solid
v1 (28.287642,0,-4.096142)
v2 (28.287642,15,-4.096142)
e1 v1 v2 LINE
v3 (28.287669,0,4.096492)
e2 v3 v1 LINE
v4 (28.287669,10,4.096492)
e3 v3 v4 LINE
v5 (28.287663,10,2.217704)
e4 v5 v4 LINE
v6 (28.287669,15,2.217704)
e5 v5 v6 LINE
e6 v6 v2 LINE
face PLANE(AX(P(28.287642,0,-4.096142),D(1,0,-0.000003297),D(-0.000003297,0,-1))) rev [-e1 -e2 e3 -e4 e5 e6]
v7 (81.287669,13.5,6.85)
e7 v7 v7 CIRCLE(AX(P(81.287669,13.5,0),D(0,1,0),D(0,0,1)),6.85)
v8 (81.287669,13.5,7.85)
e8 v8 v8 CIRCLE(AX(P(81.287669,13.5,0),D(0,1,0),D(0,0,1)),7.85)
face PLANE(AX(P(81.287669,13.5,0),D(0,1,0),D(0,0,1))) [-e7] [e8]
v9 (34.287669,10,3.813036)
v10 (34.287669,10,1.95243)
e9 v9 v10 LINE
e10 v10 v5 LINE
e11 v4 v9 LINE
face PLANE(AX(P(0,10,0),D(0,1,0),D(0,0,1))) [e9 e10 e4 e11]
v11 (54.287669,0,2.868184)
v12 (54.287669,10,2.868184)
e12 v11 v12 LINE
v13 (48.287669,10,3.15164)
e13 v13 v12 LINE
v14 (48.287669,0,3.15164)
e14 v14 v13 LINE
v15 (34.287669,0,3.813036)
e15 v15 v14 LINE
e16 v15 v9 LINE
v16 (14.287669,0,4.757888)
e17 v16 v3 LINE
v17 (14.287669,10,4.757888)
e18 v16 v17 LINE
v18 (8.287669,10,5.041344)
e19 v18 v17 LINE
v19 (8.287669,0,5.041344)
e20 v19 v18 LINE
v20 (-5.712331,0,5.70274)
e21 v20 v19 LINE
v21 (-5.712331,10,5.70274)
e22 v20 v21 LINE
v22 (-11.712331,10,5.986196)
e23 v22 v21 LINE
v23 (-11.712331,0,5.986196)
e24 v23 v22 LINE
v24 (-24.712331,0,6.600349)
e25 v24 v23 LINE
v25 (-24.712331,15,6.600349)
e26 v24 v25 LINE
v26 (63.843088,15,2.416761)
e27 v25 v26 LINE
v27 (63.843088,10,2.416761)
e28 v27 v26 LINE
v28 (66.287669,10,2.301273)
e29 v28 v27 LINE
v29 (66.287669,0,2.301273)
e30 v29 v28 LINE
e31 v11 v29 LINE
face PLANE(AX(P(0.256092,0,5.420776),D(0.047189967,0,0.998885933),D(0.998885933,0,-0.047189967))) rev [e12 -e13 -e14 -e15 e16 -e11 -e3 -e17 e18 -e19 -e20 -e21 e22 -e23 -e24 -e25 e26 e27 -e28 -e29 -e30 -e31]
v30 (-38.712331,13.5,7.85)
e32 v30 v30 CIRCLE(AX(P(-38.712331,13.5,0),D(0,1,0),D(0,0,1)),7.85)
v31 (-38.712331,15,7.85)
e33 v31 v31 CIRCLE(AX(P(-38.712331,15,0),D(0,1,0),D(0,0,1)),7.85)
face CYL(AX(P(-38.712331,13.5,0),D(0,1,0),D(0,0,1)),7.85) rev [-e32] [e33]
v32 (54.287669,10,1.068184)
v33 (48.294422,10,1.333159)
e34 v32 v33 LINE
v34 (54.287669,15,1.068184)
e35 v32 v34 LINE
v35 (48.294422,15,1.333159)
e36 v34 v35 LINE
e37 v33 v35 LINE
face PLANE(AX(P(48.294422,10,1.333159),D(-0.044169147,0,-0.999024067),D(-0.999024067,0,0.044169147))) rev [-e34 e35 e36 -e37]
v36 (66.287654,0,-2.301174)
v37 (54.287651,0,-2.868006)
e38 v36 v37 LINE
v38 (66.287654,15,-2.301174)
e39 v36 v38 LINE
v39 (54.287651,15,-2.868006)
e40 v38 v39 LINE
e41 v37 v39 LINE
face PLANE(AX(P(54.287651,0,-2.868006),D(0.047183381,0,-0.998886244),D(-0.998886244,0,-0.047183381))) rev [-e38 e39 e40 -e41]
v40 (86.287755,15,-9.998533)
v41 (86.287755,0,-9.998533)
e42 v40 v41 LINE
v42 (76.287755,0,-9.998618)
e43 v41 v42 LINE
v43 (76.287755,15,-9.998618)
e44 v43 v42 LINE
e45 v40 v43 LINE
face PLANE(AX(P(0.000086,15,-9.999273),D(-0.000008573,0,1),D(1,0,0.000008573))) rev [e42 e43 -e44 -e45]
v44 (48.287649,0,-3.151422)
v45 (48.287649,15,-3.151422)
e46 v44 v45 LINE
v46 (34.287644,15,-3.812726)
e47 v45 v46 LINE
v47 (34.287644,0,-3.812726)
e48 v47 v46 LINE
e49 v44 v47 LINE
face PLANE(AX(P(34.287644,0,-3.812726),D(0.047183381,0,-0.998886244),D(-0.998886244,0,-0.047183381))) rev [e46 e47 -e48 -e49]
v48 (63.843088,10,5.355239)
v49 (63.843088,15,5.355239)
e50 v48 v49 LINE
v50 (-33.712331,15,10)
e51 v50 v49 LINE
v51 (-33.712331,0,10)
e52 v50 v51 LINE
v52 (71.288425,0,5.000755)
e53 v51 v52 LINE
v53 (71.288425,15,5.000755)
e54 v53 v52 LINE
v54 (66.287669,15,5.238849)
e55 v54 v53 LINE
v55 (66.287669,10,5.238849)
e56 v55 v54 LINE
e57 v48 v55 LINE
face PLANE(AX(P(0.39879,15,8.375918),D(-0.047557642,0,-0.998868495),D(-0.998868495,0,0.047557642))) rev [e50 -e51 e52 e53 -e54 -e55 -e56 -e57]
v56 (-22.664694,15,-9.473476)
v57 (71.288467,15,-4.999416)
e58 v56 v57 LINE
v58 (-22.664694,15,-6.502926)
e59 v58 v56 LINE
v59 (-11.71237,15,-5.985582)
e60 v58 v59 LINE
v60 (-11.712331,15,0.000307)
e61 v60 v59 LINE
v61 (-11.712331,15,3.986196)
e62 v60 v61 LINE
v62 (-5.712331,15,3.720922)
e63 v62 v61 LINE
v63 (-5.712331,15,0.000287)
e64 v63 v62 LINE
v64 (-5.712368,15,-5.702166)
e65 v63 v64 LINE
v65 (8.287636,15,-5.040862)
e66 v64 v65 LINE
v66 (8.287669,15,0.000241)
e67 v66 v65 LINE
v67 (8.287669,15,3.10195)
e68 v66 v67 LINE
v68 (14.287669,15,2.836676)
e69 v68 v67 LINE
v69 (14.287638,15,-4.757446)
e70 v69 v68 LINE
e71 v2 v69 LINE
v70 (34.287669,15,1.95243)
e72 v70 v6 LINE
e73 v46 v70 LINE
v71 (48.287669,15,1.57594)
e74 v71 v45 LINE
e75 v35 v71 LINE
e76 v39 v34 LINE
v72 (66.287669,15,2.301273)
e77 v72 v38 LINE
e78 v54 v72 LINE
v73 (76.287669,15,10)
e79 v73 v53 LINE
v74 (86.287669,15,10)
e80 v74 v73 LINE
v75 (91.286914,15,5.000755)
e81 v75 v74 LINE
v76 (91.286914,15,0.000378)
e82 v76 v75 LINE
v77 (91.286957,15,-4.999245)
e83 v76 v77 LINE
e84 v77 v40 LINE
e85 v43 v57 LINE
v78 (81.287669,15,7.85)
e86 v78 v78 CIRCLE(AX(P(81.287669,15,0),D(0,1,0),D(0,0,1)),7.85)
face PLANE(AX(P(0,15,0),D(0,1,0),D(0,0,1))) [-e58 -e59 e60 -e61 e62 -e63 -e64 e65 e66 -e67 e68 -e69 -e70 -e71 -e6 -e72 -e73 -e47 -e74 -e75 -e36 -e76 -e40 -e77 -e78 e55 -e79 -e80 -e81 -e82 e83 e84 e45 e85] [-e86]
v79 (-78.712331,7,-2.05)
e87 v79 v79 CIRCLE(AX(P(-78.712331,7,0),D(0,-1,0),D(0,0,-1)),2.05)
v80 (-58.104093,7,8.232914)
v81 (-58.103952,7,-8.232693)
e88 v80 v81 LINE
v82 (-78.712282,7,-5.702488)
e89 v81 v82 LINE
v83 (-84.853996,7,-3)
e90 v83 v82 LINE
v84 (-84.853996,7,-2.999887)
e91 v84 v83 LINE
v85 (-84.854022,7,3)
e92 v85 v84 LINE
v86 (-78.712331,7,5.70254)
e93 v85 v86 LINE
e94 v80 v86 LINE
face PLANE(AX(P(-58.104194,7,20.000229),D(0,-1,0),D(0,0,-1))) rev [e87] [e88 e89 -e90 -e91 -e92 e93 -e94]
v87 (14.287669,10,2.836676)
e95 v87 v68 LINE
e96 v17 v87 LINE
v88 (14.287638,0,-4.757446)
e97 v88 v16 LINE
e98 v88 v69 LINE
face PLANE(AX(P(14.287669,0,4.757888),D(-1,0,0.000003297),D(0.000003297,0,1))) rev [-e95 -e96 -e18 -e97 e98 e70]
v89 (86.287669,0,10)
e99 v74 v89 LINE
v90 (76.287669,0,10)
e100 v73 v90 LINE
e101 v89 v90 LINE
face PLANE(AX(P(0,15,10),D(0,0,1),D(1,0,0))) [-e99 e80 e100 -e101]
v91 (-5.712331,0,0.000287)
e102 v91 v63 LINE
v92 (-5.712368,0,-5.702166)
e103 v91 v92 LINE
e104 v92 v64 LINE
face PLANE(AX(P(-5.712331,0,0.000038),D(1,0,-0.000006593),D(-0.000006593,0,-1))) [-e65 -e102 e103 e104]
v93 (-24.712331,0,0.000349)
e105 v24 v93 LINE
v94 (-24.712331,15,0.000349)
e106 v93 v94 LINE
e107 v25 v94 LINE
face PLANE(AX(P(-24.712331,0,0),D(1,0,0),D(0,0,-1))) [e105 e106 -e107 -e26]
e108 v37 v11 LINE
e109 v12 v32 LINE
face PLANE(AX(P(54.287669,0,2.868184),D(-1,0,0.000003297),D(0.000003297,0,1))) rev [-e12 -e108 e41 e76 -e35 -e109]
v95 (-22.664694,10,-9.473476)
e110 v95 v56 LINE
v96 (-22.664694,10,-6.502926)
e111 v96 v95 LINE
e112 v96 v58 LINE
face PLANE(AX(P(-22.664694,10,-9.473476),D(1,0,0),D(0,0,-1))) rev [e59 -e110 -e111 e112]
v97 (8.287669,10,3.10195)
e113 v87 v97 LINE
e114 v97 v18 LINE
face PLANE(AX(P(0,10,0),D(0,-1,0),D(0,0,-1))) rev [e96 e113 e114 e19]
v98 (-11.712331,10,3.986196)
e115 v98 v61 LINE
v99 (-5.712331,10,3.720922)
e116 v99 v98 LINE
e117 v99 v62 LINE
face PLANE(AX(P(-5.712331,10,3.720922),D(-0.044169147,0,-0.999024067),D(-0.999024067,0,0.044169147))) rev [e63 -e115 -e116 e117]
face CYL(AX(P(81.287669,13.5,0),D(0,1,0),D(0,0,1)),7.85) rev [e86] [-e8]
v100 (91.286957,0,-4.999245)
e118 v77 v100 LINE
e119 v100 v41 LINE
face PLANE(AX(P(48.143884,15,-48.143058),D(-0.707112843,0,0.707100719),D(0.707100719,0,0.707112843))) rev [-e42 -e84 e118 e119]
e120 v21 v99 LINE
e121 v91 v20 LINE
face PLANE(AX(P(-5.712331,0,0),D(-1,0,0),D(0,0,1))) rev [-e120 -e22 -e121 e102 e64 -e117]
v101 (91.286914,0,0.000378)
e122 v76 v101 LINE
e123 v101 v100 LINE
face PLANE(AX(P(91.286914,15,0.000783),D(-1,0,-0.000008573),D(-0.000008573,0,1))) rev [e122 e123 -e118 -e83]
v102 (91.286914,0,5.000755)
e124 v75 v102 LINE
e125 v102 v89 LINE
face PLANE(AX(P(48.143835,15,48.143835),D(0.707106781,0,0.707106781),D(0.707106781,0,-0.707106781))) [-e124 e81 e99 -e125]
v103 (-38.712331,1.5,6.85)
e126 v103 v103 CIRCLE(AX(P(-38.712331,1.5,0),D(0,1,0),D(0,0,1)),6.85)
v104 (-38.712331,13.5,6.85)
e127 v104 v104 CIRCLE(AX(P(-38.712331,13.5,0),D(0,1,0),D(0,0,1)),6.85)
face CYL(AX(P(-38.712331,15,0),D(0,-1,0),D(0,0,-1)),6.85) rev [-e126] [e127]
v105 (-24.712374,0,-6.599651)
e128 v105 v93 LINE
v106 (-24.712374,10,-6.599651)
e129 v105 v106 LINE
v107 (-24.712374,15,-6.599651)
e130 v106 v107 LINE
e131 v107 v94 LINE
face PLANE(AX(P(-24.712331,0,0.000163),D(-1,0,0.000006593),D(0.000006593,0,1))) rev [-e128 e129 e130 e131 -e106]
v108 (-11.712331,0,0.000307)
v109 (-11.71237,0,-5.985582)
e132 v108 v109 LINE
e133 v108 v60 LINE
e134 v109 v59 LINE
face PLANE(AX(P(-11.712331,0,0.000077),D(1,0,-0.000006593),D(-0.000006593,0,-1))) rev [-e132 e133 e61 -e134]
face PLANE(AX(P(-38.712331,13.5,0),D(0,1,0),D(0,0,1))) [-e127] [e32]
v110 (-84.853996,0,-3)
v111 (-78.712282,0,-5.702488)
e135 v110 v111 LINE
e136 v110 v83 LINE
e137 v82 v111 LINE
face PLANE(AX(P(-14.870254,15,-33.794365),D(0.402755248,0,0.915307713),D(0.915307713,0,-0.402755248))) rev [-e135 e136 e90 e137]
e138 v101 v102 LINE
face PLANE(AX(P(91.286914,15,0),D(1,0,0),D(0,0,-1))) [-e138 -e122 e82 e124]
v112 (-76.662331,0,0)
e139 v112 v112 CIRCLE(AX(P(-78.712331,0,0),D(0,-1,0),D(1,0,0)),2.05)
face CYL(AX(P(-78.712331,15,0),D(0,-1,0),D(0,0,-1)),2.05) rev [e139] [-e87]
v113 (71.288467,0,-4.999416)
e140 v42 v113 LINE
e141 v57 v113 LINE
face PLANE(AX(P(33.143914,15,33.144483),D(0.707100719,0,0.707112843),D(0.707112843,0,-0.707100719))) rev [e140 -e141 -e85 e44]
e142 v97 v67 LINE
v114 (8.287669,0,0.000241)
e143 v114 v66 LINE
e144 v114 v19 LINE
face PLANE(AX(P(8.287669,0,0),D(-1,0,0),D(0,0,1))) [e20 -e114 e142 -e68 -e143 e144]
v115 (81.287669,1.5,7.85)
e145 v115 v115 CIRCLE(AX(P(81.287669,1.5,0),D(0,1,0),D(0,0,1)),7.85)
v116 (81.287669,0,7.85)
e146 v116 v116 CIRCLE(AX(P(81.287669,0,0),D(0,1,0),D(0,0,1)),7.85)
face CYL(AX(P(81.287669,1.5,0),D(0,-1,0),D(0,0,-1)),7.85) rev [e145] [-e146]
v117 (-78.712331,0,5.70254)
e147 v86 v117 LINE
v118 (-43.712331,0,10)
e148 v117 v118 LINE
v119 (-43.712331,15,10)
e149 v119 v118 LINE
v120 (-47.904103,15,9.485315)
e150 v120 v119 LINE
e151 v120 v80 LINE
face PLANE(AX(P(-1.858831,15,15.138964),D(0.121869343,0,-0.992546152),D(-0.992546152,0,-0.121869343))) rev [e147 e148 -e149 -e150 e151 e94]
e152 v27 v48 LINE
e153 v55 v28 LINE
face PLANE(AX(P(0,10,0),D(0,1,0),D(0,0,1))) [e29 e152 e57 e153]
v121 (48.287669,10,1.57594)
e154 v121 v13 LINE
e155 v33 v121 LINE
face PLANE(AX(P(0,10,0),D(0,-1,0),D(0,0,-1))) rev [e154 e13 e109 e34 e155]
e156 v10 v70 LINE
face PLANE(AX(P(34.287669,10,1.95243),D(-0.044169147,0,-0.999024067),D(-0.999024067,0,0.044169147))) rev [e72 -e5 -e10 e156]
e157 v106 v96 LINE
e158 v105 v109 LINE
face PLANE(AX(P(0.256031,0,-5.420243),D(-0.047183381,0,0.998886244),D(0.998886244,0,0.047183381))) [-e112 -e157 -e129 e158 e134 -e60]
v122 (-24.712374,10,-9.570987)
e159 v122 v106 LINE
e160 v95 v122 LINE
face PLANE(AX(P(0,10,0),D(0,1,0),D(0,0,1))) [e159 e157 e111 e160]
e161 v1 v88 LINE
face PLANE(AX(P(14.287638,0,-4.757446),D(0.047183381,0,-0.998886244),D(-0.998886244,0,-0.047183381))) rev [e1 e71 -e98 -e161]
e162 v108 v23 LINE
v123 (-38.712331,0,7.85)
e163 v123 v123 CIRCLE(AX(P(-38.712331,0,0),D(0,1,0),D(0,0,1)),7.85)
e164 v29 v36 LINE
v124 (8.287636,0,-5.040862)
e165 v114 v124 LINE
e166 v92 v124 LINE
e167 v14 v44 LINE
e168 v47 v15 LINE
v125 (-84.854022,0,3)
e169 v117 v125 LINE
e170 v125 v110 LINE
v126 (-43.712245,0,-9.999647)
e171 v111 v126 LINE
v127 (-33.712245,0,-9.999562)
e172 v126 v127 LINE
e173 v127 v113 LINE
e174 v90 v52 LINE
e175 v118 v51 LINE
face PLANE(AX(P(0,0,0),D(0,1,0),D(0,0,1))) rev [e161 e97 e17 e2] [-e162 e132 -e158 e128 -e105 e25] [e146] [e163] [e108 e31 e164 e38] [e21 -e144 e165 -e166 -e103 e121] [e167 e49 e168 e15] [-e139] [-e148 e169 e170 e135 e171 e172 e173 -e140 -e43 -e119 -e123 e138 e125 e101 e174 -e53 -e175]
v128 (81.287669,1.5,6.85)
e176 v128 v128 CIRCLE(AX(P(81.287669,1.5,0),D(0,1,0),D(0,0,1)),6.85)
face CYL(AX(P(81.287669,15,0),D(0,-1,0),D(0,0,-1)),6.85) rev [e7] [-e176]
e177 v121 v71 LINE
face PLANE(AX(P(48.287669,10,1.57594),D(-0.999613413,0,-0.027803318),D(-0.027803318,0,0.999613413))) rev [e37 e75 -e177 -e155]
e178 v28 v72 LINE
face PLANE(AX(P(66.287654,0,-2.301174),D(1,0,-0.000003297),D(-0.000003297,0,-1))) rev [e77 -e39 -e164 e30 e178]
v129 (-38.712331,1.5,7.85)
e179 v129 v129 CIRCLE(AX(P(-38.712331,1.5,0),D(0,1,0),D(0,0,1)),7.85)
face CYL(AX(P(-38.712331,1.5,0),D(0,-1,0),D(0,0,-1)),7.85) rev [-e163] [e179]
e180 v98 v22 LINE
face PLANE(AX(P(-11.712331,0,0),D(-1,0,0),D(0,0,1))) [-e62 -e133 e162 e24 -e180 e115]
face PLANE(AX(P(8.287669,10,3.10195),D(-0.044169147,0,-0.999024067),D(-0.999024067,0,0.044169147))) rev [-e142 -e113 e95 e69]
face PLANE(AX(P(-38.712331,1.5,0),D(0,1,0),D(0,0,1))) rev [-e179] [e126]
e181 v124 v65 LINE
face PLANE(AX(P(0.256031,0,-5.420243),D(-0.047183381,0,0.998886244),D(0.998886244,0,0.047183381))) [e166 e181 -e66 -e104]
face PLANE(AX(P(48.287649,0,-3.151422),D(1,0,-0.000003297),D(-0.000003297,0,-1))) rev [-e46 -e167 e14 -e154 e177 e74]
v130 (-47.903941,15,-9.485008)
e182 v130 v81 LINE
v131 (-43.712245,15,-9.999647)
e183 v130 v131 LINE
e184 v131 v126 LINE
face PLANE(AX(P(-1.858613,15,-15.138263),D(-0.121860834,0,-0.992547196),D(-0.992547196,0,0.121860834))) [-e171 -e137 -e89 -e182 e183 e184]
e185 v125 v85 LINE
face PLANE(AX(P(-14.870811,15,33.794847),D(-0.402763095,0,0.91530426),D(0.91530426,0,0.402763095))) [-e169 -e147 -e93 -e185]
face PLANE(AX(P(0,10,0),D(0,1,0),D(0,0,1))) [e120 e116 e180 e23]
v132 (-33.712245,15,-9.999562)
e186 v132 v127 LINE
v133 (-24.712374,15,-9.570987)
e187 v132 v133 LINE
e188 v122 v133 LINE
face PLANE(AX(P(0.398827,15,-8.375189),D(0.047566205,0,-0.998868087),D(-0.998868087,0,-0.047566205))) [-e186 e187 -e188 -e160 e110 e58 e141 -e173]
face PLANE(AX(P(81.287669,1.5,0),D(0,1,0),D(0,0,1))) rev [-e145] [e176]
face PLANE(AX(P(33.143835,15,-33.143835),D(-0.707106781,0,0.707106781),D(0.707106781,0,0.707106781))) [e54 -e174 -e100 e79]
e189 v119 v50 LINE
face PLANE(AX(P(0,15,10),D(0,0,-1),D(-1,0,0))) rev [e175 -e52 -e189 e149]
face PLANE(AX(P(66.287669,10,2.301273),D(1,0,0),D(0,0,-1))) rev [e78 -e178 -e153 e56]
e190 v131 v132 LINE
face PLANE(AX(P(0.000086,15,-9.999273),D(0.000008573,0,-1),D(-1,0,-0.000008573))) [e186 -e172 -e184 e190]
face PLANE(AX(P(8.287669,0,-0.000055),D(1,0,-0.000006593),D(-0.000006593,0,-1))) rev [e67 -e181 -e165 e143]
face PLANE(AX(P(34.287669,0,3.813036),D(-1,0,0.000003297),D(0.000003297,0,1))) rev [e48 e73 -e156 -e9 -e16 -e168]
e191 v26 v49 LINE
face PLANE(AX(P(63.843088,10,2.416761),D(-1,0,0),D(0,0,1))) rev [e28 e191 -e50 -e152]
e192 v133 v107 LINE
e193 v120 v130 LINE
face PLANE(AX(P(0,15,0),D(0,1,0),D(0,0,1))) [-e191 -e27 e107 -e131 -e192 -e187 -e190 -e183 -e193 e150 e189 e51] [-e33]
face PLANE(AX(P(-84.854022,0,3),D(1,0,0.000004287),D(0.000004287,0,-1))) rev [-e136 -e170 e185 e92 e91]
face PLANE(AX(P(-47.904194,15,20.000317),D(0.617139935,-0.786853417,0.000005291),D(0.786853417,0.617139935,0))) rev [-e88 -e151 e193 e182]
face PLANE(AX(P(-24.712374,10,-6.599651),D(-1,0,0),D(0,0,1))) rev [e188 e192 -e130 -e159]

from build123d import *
from OCP.BRepAlgoAPI import BRepAlgoAPI_Cut
from OCP.TopTools import TopTools_ListOfShape
from build123d.topology import SkipClean

# Parameters (mm, degrees)
SKETCH1_R           = 2.05
SKETCH1_R_2         = 6.85
BOSS_EXTRUDE1_DEPTH = 15
SKETCH1_3_R         = 7.85
CUT_EXTRUDE1_DEPTH  = 1.5
CUT_EXTRUDE2_START  = 13.5
SKETCH1_4_R         = 7.85
CUT_EXTRUDE2_DEPTH  = 1.5
CUT_EXTRUDE18_DEPTH = 15
CUT_EXTRUDE19_DEPTH = 15
CUT_EXTRUDE20_DEPTH = 5
CUT_EXTRUDE21_DEPTH = 25
BOSS_EXTRUDE2_START = 8
SKETCH9_R           = 2.05
BOSS_EXTRUDE2_DEPTH = 8
CUT_EXTRUDE22_DEPTH = 30


with BuildPart() as part:
    # Sketch1 → Boss-Extrude1 (new body)
    with BuildSketch(Plane(origin=(0, 0, 0), x_dir=(1, 0, 0), z_dir=(0, 1, 0))):
        Polygon((91.286914415, -0.000755057), (91.286914415, -5.000755057), (86.287669472, -10), (76.287669472, -10), (71.288424529, -5.000755057), (-33.712330528, -10), (-43.712330528, -10), (-78.712330528, -5.702540368), (-84.854022115, -3), (-84.854022115, 0), (-84.853996395, 3), (-78.712281638, 5.702487713), (-43.712244796, 9.999647278), (-33.712244796, 9.999561545), (71.288467397, 4.999416396), (76.2877552, 9.998618479), (86.287755199, 9.998532746), (91.286957282, 4.999244943), align=None)
        with Locations(Location((-78.712330528, 0, 0), (0, 0, 270))):
            Circle(SKETCH1_R, mode=Mode.SUBTRACT)
        with Locations(Location((81.287669472, 0, 0), (0, 0, 270))):
            Circle(SKETCH1_R_2, mode=Mode.SUBTRACT)
        with Locations(Location((-38.712330528, 0, 0), (0, 0, 270))):
            Circle(SKETCH1_R_2, mode=Mode.SUBTRACT)
    extrude(amount=BOSS_EXTRUDE1_DEPTH)

    # Sketch1<3> → Cut-Extrude1 (cut)
    with BuildSketch(Plane(origin=(0, 0, 0), x_dir=(1, 0, 0), z_dir=(0, 1, 0))):
        with Locations(Location((-38.712330528, 0, 0), (0, 0, 270))):
            Circle(SKETCH1_3_R)
        with Locations(Location((81.287669472, 0, 0), (0, 0, 270))):
            Circle(SKETCH1_3_R)
    extrude(amount=CUT_EXTRUDE1_DEPTH, mode=Mode.SUBTRACT)

    # Sketch1<4> → Cut-Extrude2 (cut)
    with BuildSketch(Plane(origin=(0, 0, 0), x_dir=(1, 0, 0), z_dir=(0, 1, 0)).offset(CUT_EXTRUDE2_START)):
        with Locations(Location((-38.712330528, 0, 0), (0, 0, 270))):
            Circle(SKETCH1_4_R)
        with Locations(Location((81.287669472, 0, 0), (0, 0, 270))):
            Circle(SKETCH1_4_R)
    extrude(amount=CUT_EXTRUDE2_DEPTH, mode=Mode.SUBTRACT)

    # Sketch2 → Cut-Extrude18 (cut)
    with BuildSketch(Plane(origin=(0, 15, 0), x_dir=(1, 0, 0), z_dir=(0, 1, 0))):
        Polygon((-24.712374044, 6.599650564), (-11.712369995, 5.985582494), (-11.712330529, -0.000306581), (-11.712330529, -5.986195656), (-24.712330529, -6.600349436), (-24.712330529, -0.000349436), align=None)
        Polygon((-5.712330529, -0.000286801), (-5.712368126, 5.702166462), (8.287636234, 5.040862387), (8.287669471, -0.000240649), (8.287669471, -5.041343686), (-5.712330529, -5.702740065), align=None)
    extrude(amount=-CUT_EXTRUDE18_DEPTH, mode=Mode.SUBTRACT)

    # Sketch5 → Cut-Extrude19 (cut)
    with BuildSketch(Plane(origin=(0, 15, 0), x_dir=(1, 0, 0), z_dir=(0, 1, 0))):
        Polygon((14.287669471, -4.757888095), (14.287638103, 4.757446355), (28.287642463, 4.09614228), (28.287669471, -4.096491716), align=None)
        Polygon((34.287644332, 3.812726248), (48.287648692, 3.151422173), (48.287669471, -3.151639747), (34.287669471, -3.813036126), align=None)
        Polygon((54.287650561, 2.868006141), (66.2876543, 2.301174077), (66.287669472, -2.301272974), (54.287669471, -2.868184156), align=None)
    extrude(amount=-CUT_EXTRUDE19_DEPTH, mode=Mode.SUBTRACT)


with BuildPart() as cut_extrude20_tool:
    # Sketch6 → Cut-Extrude20 (new body)
    with BuildSketch(Plane(origin=(0, 15, 0), x_dir=(1, 0, 0), z_dir=(0, 1, 0))):
        Polygon((-24.712374044, 9.570986737), (-22.664694465, 9.473476016), (-22.664694465, 6.50292639), (-24.712374044, 6.599650564), align=None)
        Polygon((64.239989057, -2.398010718), (66.287669472, -2.301272974), (66.287669472, -5.238848578), (64.239989057, -5.336341743), (63.843088459, -5.355238781), (63.843088459, -2.416761333), align=None)
        Polygon((54.287669471, -1.068184156), (54.287669471, -2.868184156), (48.287669471, -3.151639747), (48.287669471, -1.575940198), (48.294422194, -1.333159375), align=None)
        Polygon((34.287669471, -1.952430065), (28.287669471, -2.217703838), (28.287669471, -4.096491716), (34.287669471, -3.813036126), align=None)
        Polygon((8.287669471, -3.101949747), (14.287669471, -2.836675974), (14.287669471, -4.757888095), (8.287669471, -5.041343686), align=None)
        Polygon((-5.712330529, -3.720921883), (-11.712330529, -3.986195656), (-11.712330529, -5.986195656), (-5.712330529, -5.702740065), align=None)
    extrude(amount=-CUT_EXTRUDE20_DEPTH)


with BuildPart() as part_1:
    add(part.part)

    # Cut-Extrude20: cut by cut_extrude20_tool, with a tolerance
    cut_extrude20_stock = TopTools_ListOfShape()
    cut_extrude20_stock.Append(part_1.part.wrapped)
    cut_extrude20_tools = TopTools_ListOfShape()
    cut_extrude20_tools.Append(cut_extrude20_tool.part.wrapped)
    cut_extrude20_cut = BRepAlgoAPI_Cut()
    cut_extrude20_cut.SetArguments(cut_extrude20_stock)
    cut_extrude20_cut.SetTools(cut_extrude20_tools)
    cut_extrude20_cut.SetFuzzyValue(0.00001)
    cut_extrude20_cut.Build()
    add(Compound.cast(cut_extrude20_cut.Shape()).solids(), mode=Mode.REPLACE)

    # Sketch8 → Cut-Extrude21 (cut)
    with BuildSketch(Plane.XY.offset(10)):
        Polygon((-47.904022115, 0), (-58.104022115, 8), (-84.854022115, 8), (-84.854022115, 0), align=None)
    extrude(amount=-CUT_EXTRUDE21_DEPTH, mode=Mode.SUBTRACT)

    # Sketch9 → Boss-Extrude2 (add)
    with SkipClean():  # the faces are left unmerged after this step: merging them gives an invalid solid
        with BuildSketch(Plane.XZ.offset(-8).offset(BOSS_EXTRUDE2_START)):
            Polygon((-84.854022115, 3), (-84.853996395, -3), (-78.712281638, -5.702487713), (-47.032796515, -9.591963691), (-47.380824321, 9.5495656), (-78.712330528, 5.702540368), align=None)
            with Locations((-78.712330528, 0)):
                Circle(SKETCH9_R, mode=Mode.SUBTRACT)
        extrude(amount=-BOSS_EXTRUDE2_DEPTH)

    # Sketch10 → Cut-Extrude22 (cut)
    with BuildSketch(Plane(origin=(8.5727e-05, 0, -9.999272518), x_dir=(-0.9999999999632491, 0, -8.573327994754198e-06), z_dir=(8.573327994754198e-06, 0, -0.9999999999632491))):
        Polygon((47.904022112, 15), (58.104022112, 7), (84.854022112, 7), (84.854022112, 15), align=None)
    extrude(amount=-CUT_EXTRUDE22_DEPTH, mode=Mode.SUBTRACT)


solid = part_1.part
